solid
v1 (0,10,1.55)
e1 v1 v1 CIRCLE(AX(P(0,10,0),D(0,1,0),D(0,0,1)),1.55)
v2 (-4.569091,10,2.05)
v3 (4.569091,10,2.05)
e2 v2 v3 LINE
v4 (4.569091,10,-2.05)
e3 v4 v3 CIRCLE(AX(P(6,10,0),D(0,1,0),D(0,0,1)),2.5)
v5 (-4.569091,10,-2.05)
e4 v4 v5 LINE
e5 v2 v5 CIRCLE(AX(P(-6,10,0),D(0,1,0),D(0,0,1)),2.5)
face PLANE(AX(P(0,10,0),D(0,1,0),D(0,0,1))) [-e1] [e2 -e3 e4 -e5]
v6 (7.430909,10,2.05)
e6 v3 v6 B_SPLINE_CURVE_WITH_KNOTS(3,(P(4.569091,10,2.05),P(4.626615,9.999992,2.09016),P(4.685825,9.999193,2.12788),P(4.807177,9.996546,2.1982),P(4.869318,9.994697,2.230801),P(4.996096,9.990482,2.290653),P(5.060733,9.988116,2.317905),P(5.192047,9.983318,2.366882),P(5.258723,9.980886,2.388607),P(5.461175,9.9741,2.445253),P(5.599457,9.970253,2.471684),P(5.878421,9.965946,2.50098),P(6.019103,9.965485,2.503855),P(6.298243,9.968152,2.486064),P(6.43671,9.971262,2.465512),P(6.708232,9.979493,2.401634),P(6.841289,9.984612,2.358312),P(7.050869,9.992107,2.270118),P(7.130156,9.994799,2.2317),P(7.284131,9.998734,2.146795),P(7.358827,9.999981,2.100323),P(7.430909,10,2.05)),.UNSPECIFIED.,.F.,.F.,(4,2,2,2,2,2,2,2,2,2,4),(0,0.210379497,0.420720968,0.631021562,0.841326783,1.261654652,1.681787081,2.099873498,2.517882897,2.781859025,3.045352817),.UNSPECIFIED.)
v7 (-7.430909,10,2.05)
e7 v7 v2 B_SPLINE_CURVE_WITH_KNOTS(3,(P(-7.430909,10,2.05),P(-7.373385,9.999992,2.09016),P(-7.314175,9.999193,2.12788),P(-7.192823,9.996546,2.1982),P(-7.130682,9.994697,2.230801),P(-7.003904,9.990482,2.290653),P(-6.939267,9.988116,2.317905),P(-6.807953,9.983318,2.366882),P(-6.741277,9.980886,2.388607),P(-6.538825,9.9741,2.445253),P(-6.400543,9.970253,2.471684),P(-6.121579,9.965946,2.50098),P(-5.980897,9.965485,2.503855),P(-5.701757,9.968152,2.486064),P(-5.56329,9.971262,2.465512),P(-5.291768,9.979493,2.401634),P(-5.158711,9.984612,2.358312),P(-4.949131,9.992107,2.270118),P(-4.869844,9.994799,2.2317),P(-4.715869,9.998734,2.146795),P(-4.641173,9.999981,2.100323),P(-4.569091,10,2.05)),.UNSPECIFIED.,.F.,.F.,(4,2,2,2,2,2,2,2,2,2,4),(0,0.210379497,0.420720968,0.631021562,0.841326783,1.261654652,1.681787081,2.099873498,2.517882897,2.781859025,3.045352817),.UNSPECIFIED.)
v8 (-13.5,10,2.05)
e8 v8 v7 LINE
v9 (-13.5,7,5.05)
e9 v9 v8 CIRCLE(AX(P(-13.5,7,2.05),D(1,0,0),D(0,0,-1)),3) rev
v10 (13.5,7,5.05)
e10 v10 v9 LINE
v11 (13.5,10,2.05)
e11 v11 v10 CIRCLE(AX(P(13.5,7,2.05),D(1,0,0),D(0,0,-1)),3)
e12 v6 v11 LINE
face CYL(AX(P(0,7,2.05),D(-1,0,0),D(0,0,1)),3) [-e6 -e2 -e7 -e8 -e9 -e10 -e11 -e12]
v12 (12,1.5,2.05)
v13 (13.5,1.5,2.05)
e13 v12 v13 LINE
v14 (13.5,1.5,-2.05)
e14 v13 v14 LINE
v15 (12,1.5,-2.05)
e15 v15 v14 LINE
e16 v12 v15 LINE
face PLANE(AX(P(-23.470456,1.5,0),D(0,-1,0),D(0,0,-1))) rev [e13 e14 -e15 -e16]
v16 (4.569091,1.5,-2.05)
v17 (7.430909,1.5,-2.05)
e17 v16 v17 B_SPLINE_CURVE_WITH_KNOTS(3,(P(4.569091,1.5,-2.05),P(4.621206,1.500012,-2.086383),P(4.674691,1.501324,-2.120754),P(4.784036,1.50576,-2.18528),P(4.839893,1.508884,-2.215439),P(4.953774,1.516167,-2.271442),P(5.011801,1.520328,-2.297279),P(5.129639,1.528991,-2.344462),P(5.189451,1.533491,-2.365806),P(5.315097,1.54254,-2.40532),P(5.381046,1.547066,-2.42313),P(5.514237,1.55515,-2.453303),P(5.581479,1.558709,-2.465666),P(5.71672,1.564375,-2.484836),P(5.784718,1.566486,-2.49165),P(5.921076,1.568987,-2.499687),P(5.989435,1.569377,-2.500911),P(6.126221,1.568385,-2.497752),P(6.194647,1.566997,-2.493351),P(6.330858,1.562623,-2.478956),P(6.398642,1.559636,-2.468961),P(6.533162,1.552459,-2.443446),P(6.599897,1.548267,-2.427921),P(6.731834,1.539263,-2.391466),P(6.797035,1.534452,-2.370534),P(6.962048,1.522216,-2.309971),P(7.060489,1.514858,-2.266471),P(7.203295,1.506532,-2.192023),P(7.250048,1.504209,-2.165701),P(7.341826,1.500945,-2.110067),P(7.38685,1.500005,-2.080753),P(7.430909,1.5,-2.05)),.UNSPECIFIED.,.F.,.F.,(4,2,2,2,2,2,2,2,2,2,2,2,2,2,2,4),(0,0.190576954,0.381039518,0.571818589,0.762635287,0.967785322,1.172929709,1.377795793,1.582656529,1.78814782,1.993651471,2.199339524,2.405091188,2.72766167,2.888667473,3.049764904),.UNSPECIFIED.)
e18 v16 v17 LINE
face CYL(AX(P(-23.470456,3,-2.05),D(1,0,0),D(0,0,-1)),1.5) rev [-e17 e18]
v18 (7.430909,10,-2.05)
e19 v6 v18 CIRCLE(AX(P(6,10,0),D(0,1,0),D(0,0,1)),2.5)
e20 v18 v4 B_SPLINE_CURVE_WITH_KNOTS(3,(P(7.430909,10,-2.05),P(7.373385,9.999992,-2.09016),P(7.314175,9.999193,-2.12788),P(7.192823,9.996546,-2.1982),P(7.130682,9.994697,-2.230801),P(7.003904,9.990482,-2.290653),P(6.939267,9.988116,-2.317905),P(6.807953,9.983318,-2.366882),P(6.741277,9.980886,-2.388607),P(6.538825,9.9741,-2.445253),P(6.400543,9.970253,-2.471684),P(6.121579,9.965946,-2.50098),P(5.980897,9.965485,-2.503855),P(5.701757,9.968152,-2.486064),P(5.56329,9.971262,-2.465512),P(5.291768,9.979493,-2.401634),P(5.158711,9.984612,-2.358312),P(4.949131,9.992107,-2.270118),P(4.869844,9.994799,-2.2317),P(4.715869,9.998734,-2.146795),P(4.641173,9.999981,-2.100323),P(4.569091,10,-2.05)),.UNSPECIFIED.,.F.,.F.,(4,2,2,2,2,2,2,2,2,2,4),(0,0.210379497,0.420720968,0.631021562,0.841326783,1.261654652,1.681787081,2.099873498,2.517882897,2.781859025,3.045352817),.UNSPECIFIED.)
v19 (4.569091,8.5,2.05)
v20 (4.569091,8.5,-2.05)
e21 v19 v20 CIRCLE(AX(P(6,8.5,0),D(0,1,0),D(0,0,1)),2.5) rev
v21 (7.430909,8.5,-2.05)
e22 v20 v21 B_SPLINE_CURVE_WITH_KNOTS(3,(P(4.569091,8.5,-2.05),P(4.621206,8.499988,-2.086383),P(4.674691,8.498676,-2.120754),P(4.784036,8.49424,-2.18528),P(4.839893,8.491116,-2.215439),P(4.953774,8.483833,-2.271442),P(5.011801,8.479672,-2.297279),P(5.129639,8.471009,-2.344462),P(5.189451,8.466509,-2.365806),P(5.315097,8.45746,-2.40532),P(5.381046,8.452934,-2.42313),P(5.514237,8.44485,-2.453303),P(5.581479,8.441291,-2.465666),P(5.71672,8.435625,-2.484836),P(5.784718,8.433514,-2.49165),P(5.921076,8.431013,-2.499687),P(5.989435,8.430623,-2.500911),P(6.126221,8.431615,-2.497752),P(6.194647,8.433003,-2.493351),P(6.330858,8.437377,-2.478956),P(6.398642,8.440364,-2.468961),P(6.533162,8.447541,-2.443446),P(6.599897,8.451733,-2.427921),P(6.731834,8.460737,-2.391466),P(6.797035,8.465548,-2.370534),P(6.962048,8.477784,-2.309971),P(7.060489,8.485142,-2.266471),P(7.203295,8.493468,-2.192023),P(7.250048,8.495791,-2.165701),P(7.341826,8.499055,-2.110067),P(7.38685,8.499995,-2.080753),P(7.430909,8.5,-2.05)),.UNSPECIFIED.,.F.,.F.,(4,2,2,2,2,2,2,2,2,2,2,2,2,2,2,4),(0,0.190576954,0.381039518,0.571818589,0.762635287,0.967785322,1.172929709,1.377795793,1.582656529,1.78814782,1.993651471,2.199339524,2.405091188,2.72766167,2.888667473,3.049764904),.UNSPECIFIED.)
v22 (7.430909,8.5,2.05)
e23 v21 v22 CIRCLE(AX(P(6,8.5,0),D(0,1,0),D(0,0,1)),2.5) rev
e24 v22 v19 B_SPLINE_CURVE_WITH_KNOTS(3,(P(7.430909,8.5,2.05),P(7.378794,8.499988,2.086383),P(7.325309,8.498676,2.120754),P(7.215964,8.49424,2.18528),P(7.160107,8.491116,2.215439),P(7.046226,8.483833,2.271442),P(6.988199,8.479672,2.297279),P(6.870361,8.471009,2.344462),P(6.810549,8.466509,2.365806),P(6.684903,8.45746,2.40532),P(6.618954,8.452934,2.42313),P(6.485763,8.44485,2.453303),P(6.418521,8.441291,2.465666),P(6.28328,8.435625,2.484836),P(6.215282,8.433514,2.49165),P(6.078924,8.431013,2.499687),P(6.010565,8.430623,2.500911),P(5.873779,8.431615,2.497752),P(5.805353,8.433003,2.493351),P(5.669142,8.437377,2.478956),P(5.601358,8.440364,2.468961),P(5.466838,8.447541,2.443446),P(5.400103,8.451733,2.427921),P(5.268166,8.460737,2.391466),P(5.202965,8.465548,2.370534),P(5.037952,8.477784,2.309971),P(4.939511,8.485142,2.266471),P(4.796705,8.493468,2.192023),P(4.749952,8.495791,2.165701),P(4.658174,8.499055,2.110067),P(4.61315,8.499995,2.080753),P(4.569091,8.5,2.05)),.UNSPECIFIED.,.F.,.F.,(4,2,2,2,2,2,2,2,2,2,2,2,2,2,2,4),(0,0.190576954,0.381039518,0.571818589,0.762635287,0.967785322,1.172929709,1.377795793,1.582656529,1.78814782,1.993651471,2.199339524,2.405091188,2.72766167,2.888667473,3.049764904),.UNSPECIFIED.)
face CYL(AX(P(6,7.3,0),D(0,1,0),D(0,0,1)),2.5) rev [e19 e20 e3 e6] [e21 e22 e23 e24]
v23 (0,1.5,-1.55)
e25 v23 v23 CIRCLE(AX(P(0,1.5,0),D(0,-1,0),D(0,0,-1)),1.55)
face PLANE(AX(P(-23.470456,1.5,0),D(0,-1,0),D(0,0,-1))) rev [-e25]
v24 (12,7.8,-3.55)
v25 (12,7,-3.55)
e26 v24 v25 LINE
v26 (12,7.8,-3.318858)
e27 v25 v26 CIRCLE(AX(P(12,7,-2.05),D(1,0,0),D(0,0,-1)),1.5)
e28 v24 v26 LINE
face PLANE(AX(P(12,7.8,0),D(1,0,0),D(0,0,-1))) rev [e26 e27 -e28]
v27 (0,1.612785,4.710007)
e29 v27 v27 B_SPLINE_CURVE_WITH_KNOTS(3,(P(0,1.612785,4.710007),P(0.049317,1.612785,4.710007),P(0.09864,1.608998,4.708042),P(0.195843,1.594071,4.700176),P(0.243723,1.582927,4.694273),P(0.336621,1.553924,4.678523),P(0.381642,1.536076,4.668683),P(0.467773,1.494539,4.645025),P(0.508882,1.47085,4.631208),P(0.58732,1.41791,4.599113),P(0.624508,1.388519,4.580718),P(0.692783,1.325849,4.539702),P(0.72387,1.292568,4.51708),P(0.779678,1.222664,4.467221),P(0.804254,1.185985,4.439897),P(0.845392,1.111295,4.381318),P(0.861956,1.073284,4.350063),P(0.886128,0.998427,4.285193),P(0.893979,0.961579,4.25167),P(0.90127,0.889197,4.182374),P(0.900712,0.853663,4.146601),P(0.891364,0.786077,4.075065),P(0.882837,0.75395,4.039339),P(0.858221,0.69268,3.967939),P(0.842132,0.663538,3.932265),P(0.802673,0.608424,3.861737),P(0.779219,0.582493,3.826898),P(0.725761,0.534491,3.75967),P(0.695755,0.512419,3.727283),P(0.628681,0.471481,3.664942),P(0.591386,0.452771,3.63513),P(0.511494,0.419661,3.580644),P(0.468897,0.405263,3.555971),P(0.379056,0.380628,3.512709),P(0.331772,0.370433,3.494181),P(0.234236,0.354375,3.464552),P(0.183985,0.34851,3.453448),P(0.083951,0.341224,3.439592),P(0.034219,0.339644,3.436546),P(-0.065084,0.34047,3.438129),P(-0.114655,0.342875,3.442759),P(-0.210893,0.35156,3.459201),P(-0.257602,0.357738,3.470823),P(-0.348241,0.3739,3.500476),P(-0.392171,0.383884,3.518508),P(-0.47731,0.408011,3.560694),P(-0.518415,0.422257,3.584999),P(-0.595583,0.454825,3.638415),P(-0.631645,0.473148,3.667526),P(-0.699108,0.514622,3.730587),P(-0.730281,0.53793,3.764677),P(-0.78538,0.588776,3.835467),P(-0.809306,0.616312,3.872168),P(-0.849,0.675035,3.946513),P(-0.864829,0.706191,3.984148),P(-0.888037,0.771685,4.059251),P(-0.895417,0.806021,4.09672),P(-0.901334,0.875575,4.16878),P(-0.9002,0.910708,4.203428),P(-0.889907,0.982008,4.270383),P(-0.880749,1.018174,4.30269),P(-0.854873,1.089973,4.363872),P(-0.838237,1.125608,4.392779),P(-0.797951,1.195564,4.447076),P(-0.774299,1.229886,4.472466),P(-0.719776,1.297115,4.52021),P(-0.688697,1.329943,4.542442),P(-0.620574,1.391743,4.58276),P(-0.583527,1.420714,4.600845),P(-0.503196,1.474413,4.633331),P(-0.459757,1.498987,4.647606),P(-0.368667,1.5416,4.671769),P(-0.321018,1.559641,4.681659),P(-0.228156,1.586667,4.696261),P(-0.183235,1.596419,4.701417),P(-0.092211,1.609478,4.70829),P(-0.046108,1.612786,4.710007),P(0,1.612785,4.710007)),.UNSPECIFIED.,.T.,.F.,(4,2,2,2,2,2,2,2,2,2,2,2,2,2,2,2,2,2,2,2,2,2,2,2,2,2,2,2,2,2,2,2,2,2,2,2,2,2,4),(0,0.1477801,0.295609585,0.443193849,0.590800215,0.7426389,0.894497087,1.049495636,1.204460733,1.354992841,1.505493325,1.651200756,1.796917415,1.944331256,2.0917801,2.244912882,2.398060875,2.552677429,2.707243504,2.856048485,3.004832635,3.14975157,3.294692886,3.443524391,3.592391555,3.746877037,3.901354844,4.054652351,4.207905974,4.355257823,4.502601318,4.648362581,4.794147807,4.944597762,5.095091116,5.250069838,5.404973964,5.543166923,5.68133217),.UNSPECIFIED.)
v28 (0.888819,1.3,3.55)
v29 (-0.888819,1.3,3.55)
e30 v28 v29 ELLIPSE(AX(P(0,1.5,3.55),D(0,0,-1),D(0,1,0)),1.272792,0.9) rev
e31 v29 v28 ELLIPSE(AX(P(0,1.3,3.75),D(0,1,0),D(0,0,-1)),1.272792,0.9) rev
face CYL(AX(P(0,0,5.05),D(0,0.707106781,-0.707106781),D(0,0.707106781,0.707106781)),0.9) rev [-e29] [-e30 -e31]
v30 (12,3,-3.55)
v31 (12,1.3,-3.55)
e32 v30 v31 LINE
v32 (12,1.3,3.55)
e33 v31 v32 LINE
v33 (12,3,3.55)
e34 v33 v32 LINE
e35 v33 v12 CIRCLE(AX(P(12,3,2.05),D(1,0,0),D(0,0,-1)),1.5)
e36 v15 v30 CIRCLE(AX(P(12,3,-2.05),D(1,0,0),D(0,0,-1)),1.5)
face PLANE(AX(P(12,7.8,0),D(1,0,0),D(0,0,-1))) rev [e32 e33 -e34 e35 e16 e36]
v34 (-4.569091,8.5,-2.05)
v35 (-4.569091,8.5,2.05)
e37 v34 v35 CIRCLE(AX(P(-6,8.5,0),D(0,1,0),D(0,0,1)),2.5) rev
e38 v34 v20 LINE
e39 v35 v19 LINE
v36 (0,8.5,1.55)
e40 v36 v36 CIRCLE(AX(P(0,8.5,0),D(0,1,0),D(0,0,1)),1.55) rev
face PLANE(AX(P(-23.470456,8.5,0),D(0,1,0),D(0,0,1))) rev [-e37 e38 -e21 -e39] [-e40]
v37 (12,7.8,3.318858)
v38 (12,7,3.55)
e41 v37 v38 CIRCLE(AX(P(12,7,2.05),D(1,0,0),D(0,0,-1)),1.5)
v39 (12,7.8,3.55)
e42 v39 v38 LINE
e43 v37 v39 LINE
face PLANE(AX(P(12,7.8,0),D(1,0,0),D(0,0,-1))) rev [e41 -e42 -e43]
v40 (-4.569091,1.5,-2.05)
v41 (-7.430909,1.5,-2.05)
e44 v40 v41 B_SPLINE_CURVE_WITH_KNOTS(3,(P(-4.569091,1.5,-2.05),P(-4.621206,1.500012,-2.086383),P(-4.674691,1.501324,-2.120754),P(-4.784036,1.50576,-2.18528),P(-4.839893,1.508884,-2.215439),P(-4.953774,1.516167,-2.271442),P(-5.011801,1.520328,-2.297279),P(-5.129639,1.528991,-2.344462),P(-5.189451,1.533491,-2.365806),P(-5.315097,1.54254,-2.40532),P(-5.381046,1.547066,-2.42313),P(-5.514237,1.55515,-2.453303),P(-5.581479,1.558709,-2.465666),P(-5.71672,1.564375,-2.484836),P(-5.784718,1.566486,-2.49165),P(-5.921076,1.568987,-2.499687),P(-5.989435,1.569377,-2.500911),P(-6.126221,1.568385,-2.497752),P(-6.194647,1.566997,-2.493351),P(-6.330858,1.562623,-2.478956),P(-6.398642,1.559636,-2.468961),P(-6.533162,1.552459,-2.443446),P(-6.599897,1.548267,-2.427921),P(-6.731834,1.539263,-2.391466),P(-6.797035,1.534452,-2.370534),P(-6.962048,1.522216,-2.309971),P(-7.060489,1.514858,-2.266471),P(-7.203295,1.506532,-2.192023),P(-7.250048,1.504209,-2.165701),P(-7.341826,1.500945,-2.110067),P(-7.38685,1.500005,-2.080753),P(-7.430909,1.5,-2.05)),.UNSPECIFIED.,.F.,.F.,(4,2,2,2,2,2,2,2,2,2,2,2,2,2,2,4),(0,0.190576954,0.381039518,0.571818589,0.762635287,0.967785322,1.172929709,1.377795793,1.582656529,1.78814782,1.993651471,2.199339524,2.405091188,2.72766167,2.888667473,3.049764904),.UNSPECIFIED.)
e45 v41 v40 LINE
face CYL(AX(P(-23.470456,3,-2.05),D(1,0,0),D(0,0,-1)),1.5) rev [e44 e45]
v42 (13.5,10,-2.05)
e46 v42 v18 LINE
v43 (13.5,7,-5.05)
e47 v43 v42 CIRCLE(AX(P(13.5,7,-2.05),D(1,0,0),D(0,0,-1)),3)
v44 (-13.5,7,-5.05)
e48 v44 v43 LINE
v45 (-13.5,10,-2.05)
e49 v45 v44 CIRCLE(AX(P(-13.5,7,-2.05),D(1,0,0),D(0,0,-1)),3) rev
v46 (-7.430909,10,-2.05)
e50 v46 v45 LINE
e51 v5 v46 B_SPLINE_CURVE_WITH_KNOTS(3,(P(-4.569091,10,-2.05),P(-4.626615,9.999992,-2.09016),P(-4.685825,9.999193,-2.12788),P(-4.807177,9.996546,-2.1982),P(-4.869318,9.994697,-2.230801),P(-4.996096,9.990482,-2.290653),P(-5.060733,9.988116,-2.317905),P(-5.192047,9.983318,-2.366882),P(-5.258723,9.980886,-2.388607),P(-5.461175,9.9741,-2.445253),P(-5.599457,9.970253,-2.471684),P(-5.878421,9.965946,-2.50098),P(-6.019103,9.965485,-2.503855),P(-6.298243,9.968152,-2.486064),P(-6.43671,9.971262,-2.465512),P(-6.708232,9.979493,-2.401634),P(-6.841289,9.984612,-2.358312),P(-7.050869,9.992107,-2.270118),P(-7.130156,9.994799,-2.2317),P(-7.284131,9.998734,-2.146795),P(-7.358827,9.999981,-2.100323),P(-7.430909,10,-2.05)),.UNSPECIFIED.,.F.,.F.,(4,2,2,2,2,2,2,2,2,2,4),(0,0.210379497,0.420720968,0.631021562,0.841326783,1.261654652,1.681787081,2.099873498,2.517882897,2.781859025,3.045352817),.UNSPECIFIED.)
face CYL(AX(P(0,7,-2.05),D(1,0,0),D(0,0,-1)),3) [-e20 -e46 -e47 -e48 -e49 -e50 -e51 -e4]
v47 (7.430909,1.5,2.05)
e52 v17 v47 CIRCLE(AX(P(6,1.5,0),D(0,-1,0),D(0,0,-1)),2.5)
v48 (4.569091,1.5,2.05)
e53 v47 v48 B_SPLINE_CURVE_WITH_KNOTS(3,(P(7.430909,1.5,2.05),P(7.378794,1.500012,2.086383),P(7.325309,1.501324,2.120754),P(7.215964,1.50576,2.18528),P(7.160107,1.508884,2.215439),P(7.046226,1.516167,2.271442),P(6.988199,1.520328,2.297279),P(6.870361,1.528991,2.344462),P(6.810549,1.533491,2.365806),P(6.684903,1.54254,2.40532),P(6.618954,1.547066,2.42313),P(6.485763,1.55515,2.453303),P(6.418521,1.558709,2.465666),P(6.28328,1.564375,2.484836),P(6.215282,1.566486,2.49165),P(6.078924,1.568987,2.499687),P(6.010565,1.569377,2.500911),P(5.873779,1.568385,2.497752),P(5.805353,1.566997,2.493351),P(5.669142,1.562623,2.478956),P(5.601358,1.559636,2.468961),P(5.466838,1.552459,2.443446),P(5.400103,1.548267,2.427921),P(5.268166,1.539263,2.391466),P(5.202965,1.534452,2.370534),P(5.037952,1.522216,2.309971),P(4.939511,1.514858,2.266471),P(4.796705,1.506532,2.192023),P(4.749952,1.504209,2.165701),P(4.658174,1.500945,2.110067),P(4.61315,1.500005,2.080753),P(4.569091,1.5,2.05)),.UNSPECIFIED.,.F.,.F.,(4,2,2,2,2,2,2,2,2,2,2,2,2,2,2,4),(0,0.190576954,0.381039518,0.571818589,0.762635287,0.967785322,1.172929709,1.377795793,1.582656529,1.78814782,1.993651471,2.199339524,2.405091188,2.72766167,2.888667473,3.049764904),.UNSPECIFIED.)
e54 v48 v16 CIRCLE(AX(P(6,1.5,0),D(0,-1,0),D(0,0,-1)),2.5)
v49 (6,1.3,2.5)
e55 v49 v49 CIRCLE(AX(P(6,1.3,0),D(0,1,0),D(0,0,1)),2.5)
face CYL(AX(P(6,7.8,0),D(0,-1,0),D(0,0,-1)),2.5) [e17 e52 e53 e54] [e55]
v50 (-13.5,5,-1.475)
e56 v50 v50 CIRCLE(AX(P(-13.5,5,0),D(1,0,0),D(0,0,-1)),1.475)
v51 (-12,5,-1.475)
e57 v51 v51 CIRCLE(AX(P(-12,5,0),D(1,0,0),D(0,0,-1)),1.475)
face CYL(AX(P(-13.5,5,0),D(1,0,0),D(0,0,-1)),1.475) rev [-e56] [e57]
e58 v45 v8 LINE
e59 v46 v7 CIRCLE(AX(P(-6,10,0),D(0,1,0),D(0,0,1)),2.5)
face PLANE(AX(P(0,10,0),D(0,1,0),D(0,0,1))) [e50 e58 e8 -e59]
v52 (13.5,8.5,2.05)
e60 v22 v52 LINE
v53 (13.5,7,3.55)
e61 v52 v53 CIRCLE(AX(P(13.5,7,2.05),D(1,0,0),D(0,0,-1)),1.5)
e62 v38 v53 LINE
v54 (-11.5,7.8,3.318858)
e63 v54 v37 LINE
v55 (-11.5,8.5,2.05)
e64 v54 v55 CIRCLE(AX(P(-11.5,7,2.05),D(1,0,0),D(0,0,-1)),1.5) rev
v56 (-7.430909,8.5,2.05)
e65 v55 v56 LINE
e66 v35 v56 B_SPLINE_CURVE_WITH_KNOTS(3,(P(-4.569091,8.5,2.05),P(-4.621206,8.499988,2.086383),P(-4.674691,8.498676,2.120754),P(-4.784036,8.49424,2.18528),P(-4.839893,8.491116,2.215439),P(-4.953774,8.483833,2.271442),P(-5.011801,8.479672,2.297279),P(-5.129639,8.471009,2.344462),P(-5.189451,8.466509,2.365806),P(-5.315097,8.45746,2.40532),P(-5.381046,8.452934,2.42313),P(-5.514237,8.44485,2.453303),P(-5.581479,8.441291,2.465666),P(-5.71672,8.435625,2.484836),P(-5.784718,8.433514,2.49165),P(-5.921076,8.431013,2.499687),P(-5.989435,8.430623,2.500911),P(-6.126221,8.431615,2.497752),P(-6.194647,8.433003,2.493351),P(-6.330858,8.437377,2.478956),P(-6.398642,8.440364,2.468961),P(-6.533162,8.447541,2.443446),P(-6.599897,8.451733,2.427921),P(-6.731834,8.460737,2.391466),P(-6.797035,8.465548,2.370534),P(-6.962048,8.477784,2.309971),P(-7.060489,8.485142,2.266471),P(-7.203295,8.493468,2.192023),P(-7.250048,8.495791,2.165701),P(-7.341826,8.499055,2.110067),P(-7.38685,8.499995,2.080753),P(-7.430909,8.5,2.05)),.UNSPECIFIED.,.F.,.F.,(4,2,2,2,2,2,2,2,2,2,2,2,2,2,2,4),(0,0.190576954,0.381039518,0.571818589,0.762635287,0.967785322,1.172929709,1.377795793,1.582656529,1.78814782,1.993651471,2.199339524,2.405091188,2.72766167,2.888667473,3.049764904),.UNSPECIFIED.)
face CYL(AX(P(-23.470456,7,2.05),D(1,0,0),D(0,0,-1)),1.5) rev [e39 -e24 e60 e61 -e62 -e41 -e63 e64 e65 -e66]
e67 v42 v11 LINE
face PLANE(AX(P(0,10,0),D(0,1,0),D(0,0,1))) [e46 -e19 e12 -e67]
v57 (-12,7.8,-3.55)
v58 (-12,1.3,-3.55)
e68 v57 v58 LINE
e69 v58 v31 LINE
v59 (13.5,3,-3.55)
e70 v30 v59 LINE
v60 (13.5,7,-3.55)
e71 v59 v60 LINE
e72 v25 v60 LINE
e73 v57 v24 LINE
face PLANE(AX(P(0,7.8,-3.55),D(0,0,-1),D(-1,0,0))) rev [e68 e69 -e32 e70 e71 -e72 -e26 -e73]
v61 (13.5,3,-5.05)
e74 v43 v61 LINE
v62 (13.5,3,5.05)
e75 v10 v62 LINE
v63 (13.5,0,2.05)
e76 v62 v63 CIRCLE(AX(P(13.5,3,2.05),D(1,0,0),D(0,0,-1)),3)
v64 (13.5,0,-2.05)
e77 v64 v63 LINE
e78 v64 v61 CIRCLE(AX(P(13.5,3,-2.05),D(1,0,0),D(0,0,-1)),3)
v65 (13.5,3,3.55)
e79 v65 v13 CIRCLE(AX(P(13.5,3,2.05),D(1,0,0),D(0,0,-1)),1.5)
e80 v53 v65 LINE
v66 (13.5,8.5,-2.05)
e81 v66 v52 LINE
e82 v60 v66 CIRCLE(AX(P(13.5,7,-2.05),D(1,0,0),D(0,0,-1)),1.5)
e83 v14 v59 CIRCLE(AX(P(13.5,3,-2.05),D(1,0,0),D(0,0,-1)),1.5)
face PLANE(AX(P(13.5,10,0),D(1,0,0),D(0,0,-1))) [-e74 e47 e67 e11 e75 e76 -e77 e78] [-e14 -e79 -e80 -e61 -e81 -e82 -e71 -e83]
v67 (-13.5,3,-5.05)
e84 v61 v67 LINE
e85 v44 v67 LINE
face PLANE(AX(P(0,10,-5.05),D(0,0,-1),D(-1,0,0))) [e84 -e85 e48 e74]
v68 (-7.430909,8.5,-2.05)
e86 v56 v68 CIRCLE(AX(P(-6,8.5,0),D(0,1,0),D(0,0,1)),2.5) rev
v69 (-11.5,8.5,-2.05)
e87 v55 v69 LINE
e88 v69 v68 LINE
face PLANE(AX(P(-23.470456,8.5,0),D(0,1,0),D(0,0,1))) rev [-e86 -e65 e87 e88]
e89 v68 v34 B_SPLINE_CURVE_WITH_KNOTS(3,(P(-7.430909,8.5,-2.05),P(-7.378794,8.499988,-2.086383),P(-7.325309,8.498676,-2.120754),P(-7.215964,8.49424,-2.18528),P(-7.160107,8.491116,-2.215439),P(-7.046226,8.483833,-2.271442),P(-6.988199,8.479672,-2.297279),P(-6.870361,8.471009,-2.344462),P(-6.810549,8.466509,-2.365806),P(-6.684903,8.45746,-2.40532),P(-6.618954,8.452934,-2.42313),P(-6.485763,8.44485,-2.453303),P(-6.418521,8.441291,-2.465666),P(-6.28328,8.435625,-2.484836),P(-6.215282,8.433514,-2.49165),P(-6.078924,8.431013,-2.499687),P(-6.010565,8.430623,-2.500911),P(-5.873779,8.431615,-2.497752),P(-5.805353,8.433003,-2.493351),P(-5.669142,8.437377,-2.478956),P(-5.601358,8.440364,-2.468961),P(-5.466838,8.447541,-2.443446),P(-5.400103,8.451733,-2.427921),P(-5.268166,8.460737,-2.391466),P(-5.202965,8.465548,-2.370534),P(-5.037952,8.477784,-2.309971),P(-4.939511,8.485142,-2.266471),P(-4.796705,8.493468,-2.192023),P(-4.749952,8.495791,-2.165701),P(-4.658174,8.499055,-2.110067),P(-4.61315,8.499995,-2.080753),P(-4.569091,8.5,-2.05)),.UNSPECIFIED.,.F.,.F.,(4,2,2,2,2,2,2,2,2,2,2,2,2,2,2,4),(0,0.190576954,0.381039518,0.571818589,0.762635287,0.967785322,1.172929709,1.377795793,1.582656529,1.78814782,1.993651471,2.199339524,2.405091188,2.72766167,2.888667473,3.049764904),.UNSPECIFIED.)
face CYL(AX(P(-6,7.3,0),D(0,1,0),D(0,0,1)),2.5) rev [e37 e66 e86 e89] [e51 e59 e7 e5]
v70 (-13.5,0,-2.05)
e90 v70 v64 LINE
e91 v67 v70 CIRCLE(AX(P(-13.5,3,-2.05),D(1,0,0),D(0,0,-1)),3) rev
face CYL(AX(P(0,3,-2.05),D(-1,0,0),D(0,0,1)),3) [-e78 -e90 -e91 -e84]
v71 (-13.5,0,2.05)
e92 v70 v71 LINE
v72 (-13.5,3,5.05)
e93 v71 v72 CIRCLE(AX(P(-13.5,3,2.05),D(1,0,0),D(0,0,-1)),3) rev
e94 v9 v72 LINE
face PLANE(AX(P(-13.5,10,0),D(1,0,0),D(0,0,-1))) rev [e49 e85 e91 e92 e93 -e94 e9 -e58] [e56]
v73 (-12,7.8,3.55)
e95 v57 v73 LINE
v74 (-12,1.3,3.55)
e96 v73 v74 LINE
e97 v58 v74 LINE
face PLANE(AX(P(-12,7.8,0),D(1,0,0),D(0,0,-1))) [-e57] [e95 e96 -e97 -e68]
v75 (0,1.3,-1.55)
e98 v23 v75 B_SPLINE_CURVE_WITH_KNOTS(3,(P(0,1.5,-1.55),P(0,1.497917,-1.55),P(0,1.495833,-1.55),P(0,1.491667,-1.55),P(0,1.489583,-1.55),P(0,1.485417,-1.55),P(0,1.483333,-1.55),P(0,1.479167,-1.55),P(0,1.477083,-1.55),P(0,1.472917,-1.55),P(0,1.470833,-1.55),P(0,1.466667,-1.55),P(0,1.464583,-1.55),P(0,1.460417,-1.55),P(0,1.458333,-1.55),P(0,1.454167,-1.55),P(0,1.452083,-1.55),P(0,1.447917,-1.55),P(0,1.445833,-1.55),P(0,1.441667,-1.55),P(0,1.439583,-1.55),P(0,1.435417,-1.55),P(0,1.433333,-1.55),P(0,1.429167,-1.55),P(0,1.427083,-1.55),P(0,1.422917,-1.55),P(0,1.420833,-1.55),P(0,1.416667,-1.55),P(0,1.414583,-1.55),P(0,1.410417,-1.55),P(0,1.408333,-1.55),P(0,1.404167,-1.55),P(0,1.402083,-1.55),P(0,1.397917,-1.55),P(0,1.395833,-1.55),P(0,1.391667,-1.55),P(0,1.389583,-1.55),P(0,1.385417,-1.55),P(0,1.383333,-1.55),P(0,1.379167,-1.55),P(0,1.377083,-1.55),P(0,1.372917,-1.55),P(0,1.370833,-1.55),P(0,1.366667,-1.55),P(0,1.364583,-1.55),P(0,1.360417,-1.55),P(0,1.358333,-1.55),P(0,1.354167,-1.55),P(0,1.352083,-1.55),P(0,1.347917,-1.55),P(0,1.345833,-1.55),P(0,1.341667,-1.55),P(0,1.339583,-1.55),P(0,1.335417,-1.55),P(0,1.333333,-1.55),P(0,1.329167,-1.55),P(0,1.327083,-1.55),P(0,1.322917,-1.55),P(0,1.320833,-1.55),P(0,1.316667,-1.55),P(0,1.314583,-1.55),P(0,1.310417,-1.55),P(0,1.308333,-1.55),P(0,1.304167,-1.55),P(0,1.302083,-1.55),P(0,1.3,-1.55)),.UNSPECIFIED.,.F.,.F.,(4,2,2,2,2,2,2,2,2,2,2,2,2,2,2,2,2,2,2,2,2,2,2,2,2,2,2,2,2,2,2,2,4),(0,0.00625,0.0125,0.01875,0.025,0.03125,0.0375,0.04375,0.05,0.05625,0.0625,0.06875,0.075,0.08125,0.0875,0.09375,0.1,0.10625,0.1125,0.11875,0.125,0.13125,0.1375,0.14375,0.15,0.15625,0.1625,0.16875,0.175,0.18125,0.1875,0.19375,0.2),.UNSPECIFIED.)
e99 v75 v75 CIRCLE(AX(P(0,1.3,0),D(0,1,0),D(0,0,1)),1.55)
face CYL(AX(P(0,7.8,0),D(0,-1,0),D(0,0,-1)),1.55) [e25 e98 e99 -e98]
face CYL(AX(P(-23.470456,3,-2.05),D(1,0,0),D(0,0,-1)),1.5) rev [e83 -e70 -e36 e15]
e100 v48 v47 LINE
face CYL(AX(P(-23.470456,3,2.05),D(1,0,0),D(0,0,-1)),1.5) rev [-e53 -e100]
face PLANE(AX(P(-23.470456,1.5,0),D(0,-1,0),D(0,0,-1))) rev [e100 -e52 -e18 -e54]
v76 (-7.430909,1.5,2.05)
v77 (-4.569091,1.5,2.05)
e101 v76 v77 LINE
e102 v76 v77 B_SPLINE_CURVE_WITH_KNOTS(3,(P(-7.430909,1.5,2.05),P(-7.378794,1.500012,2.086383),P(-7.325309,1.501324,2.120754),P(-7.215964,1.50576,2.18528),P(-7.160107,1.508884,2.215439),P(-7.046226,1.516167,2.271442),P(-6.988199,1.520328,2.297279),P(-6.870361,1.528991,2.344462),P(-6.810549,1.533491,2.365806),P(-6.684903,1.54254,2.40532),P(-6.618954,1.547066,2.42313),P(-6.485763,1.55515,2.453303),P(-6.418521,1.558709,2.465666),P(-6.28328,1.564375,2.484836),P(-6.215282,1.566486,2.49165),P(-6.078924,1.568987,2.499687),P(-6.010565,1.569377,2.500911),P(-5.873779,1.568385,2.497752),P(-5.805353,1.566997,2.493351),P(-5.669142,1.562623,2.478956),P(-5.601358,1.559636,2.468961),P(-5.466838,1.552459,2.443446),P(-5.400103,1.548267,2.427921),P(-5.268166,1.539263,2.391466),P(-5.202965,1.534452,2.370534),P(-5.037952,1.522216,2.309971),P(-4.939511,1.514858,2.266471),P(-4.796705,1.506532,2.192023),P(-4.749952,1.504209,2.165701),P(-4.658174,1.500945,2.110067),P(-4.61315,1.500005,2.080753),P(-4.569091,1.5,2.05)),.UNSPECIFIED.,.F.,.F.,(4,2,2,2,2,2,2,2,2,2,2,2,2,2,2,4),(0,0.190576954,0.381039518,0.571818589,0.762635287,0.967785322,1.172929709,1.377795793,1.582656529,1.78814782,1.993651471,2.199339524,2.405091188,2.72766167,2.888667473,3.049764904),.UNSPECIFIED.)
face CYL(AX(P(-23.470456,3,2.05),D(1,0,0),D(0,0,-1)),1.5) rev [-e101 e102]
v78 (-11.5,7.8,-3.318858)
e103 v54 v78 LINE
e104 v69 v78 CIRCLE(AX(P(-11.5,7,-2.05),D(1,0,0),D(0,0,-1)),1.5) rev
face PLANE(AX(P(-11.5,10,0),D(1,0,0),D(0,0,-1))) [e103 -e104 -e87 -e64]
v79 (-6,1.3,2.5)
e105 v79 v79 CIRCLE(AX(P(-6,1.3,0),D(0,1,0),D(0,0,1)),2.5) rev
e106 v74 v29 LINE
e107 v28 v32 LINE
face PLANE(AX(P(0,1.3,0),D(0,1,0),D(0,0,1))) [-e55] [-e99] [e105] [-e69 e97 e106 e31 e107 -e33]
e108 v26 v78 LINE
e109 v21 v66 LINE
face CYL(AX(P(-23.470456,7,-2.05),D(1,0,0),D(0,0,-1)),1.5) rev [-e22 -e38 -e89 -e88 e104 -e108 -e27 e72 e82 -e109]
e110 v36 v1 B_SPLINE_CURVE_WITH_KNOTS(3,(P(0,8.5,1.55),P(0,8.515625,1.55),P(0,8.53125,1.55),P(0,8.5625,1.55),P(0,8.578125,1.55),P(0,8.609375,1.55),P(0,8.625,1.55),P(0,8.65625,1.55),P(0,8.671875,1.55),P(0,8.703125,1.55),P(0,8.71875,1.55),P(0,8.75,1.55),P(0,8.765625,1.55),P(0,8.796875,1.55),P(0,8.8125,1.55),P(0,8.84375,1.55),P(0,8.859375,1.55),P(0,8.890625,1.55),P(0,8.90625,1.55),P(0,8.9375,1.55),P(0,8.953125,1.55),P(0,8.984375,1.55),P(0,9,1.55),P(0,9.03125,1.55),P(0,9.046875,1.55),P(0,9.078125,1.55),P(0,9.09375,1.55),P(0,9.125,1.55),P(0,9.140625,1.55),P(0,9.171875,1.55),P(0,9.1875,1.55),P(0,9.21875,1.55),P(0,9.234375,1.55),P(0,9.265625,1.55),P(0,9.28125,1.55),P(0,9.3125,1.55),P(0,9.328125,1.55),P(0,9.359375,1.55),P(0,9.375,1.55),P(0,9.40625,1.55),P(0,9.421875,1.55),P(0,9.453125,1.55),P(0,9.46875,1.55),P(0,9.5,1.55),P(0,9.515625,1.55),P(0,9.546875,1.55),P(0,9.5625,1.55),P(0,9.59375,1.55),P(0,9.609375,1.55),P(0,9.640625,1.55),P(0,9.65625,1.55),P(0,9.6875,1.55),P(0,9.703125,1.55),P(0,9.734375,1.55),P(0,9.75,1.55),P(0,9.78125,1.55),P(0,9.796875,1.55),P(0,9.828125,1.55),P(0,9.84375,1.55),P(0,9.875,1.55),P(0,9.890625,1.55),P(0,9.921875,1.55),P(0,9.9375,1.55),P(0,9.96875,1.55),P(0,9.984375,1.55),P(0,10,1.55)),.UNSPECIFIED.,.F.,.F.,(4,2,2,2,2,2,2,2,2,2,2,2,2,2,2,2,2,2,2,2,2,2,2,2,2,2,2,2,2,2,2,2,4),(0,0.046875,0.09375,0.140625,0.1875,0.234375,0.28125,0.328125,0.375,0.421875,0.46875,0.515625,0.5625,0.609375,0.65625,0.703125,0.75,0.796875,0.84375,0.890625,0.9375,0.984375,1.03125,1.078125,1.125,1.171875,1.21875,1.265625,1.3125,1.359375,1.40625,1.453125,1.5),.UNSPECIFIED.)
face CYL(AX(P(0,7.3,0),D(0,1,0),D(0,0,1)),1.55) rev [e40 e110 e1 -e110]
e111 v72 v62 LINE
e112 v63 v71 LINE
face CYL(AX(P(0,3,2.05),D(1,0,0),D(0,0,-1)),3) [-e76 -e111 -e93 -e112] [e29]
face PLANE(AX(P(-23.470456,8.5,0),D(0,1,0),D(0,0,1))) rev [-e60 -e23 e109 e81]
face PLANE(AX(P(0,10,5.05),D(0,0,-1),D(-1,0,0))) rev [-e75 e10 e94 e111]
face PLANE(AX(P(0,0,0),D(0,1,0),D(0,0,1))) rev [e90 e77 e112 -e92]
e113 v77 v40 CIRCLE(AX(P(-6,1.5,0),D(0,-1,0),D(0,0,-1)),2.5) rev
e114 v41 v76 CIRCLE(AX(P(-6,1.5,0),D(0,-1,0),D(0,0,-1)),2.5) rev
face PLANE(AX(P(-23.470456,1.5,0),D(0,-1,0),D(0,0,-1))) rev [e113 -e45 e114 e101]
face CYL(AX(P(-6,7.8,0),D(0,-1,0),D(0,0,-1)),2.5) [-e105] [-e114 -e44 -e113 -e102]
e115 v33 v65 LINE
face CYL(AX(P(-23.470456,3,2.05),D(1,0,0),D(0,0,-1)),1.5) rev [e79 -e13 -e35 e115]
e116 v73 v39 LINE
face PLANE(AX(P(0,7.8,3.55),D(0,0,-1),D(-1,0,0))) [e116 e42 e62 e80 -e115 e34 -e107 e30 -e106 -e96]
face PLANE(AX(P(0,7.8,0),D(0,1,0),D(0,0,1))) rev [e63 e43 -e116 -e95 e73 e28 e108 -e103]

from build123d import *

# Parameters (mm, degrees)
SKETCH1_W               = 27
SKETCH1_H               = 10.1
SKETCH1_W_2             = 24
SKETCH1_H_2             = 7.1
SKETCH1_R               = 2.5
SKETCH1_R_2             = 1.55
BOSS_EXTRUDE2_DEPTH     = 10
CUT_EXTRUDE2_START      = 10
SKETCH1_5_R             = 2.5
SKETCH1_5_R_2           = 1.55
CUT_EXTRUDE2_DEPTH      = 2.7
FILLET1_R               = 3
CUT_EXTRUDE3_START      = 7.8
SKETCH1_6_W             = 24
SKETCH1_6_H             = 7.1
SKETCH1_6_R             = 2.5
SKETCH1_6_R_2           = 1.55
CUT_EXTRUDE3_DEPTH      = 6.5
SKETCH2_R               = 1.475
CUT_EXTRUDE4_DEPTH      = 25
CUT_EXTRUDE5_DEPTH      = 30.23187487
CUT_EXTRUDE5_DEPTH_BACK = 30.23187487
SKETCH2_3_R             = 1.475
SKETCH3_R               = 0.9
CUT_EXTRUDE6_DEPTH      = 18.54287621


with BuildPart() as part:
    # Sketch1 → Boss-Extrude2 (new body)
    # profile 1 of 5: a face of its own
    with BuildSketch(Plane(origin=(0, 0, 0), x_dir=(1, 0, 0), z_dir=(0, 1, 0))):
        Rectangle(SKETCH1_W, SKETCH1_H)
        Rectangle(SKETCH1_W_2, SKETCH1_H_2, mode=Mode.SUBTRACT)
    # profile 2 of 5: a face of its own
    with BuildSketch(Plane(origin=(0, 0, 0), x_dir=(1, 0, 0), z_dir=(0, 1, 0))):
        Rectangle(SKETCH1_W_2, SKETCH1_H_2)
        with Locations((6, 0)):
            Circle(SKETCH1_R, mode=Mode.SUBTRACT)
        Circle(SKETCH1_R_2, mode=Mode.SUBTRACT)
        with Locations((-6, 0)):
            Circle(SKETCH1_R, mode=Mode.SUBTRACT)
    # profile 3 of 5: a face of its own
    with BuildSketch(Plane(origin=(0, 0, 0), x_dir=(1, 0, 0), z_dir=(0, 1, 0))):
        with Locations((-6, 0)):
            Circle(SKETCH1_R)
    # profile 4 of 5: a face of its own
    with BuildSketch(Plane(origin=(0, 0, 0), x_dir=(1, 0, 0), z_dir=(0, 1, 0))):
        Circle(SKETCH1_R_2)
    # profile 5 of 5: a face of its own
    with BuildSketch(Plane(origin=(0, 0, 0), x_dir=(1, 0, 0), z_dir=(0, 1, 0))):
        with Locations((6, 0)):
            Circle(SKETCH1_R)
    extrude(amount=BOSS_EXTRUDE2_DEPTH)

    # Sketch1<5> → Cut-Extrude2 (cut)
    with BuildSketch(Plane(origin=(0, 0, 0), x_dir=(1, 0, 0), z_dir=(0, 1, 0)).offset(CUT_EXTRUDE2_START)):
        with Locations(Location((6, 0, 0), (0, 0, 270))):
            Circle(SKETCH1_5_R)
        with Locations(Location((0, 0, 0), (0, 0, 270))):
            Circle(SKETCH1_5_R_2)
        with Locations(Location((-6, 0, 0), (0, 0, 270))):
            Circle(SKETCH1_5_R)
    extrude(amount=-CUT_EXTRUDE2_DEPTH, mode=Mode.SUBTRACT)

    # Fillet1
    # the kernel refuses this fillet: 3 mm, written as the material it takes off along each edge
    with BuildSketch(Plane(origin=(21, 10, 5.05), x_dir=(0, 0, -1), z_dir=(-1, 0, 0)), Plane(origin=(-21, 0, -5.05), x_dir=(0, 1, 0), z_dir=(1, 0, 0))) as fillet1_piece_1:
        with BuildLine():
            CenterArc((FILLET1_R, FILLET1_R), FILLET1_R, 180, 90)
            Line((0, FILLET1_R), (0, 0))
            Line((0, 0), (FILLET1_R, 0))
        make_face()
    extrude(amount=42, mode=Mode.SUBTRACT)
    with BuildSketch(Plane(origin=(-21, 10, -5.05), x_dir=(0, -1, 0), z_dir=(1, 0, 0)), Plane(origin=(21, 0, 5.05), x_dir=(0, 0, -1), z_dir=(-1, 0, 0))) as fillet1_piece_2:
        with BuildLine():
            CenterArc((FILLET1_R, -FILLET1_R), FILLET1_R, 90, 90)
            Line((0, -FILLET1_R), (0, 0))
            Line((0, 0), (FILLET1_R, 0))
        make_face()
    extrude(amount=42, mode=Mode.SUBTRACT)

    # Sketch1<6> → Cut-Extrude3 (cut)
    with BuildSketch(Plane(origin=(0, 0, 0), x_dir=(1, 0, 0), z_dir=(0, 1, 0)).offset(CUT_EXTRUDE3_START)):
        Rectangle(SKETCH1_6_W, SKETCH1_6_H)
        with Locations(Location((6, 0, 0), (0, 0, 270))):
            Circle(SKETCH1_6_R, mode=Mode.SUBTRACT)
        with Locations(Location((0, 0, 0), (0, 0, 270))):
            Circle(SKETCH1_6_R_2, mode=Mode.SUBTRACT)
        with Locations(Location((-6, 0, 0), (0, 0, 270))):
            Circle(SKETCH1_6_R, mode=Mode.SUBTRACT)
    extrude(amount=-CUT_EXTRUDE3_DEPTH, mode=Mode.SUBTRACT)

    # Sketch2 → Cut-Extrude4 (cut)
    # profile 1 of 2: a face of its own
    with BuildSketch(Plane(origin=(13.5, 0, 0), x_dir=(0, 0, -1), z_dir=(1, 0, 0))):
        with BuildLine():
            Line((2.05, 8.5), (-2.05, 8.5))
            ThreePointArc((-2.05, 8.5), (-3.110660172, 8.060660172), (-3.55, 7))
            Line((-3.55, 7), (-3.55, 3))
            ThreePointArc((-3.55, 3), (-3.110660172, 1.939339828), (-2.05, 1.5))
            Line((-2.05, 1.5), (2.05, 1.5))
            ThreePointArc((2.05, 1.5), (3.110660172, 1.939339828), (3.55, 3))
            Line((3.55, 3), (3.55, 7))
            ThreePointArc((3.55, 7), (3.110660172, 8.060660172), (2.05, 8.5))
        make_face()
        with Locations((0, 5)):
            Circle(SKETCH2_R, mode=Mode.SUBTRACT)
    # profile 2 of 2: a face of its own
    with BuildSketch(Plane(origin=(13.5, 0, 0), x_dir=(0, 0, -1), z_dir=(1, 0, 0))):
        with Locations((0, 5)):
            Circle(SKETCH2_R)
    extrude(amount=-CUT_EXTRUDE4_DEPTH, mode=Mode.SUBTRACT)

    # Sketch2<3> → Cut-Extrude5 (cut, two sides: drawn at the far end of the back side and taken through both)
    with BuildSketch(Plane(origin=(13.5, 0, 0), x_dir=(0, 0, -1), z_dir=(1, 0, 0)).offset(-CUT_EXTRUDE5_DEPTH_BACK)):
        with Locations((0, 5)):
            Circle(SKETCH2_3_R)
    extrude(amount=CUT_EXTRUDE5_DEPTH + CUT_EXTRUDE5_DEPTH_BACK, mode=Mode.SUBTRACT)

    # Sketch3 → Cut-Extrude6 (cut, through all)
    with BuildSketch(Plane(origin=(0, 0, 0), x_dir=(1, 0, 0), z_dir=(0, -0.7071067811865475, 0.7071067811865477))):
        with Locations(Location((0, 3.570889245, 0), (0, 0, 90))):
            Circle(SKETCH3_R)
    extrude(amount=CUT_EXTRUDE6_DEPTH, mode=Mode.SUBTRACT)


solid = part.part
